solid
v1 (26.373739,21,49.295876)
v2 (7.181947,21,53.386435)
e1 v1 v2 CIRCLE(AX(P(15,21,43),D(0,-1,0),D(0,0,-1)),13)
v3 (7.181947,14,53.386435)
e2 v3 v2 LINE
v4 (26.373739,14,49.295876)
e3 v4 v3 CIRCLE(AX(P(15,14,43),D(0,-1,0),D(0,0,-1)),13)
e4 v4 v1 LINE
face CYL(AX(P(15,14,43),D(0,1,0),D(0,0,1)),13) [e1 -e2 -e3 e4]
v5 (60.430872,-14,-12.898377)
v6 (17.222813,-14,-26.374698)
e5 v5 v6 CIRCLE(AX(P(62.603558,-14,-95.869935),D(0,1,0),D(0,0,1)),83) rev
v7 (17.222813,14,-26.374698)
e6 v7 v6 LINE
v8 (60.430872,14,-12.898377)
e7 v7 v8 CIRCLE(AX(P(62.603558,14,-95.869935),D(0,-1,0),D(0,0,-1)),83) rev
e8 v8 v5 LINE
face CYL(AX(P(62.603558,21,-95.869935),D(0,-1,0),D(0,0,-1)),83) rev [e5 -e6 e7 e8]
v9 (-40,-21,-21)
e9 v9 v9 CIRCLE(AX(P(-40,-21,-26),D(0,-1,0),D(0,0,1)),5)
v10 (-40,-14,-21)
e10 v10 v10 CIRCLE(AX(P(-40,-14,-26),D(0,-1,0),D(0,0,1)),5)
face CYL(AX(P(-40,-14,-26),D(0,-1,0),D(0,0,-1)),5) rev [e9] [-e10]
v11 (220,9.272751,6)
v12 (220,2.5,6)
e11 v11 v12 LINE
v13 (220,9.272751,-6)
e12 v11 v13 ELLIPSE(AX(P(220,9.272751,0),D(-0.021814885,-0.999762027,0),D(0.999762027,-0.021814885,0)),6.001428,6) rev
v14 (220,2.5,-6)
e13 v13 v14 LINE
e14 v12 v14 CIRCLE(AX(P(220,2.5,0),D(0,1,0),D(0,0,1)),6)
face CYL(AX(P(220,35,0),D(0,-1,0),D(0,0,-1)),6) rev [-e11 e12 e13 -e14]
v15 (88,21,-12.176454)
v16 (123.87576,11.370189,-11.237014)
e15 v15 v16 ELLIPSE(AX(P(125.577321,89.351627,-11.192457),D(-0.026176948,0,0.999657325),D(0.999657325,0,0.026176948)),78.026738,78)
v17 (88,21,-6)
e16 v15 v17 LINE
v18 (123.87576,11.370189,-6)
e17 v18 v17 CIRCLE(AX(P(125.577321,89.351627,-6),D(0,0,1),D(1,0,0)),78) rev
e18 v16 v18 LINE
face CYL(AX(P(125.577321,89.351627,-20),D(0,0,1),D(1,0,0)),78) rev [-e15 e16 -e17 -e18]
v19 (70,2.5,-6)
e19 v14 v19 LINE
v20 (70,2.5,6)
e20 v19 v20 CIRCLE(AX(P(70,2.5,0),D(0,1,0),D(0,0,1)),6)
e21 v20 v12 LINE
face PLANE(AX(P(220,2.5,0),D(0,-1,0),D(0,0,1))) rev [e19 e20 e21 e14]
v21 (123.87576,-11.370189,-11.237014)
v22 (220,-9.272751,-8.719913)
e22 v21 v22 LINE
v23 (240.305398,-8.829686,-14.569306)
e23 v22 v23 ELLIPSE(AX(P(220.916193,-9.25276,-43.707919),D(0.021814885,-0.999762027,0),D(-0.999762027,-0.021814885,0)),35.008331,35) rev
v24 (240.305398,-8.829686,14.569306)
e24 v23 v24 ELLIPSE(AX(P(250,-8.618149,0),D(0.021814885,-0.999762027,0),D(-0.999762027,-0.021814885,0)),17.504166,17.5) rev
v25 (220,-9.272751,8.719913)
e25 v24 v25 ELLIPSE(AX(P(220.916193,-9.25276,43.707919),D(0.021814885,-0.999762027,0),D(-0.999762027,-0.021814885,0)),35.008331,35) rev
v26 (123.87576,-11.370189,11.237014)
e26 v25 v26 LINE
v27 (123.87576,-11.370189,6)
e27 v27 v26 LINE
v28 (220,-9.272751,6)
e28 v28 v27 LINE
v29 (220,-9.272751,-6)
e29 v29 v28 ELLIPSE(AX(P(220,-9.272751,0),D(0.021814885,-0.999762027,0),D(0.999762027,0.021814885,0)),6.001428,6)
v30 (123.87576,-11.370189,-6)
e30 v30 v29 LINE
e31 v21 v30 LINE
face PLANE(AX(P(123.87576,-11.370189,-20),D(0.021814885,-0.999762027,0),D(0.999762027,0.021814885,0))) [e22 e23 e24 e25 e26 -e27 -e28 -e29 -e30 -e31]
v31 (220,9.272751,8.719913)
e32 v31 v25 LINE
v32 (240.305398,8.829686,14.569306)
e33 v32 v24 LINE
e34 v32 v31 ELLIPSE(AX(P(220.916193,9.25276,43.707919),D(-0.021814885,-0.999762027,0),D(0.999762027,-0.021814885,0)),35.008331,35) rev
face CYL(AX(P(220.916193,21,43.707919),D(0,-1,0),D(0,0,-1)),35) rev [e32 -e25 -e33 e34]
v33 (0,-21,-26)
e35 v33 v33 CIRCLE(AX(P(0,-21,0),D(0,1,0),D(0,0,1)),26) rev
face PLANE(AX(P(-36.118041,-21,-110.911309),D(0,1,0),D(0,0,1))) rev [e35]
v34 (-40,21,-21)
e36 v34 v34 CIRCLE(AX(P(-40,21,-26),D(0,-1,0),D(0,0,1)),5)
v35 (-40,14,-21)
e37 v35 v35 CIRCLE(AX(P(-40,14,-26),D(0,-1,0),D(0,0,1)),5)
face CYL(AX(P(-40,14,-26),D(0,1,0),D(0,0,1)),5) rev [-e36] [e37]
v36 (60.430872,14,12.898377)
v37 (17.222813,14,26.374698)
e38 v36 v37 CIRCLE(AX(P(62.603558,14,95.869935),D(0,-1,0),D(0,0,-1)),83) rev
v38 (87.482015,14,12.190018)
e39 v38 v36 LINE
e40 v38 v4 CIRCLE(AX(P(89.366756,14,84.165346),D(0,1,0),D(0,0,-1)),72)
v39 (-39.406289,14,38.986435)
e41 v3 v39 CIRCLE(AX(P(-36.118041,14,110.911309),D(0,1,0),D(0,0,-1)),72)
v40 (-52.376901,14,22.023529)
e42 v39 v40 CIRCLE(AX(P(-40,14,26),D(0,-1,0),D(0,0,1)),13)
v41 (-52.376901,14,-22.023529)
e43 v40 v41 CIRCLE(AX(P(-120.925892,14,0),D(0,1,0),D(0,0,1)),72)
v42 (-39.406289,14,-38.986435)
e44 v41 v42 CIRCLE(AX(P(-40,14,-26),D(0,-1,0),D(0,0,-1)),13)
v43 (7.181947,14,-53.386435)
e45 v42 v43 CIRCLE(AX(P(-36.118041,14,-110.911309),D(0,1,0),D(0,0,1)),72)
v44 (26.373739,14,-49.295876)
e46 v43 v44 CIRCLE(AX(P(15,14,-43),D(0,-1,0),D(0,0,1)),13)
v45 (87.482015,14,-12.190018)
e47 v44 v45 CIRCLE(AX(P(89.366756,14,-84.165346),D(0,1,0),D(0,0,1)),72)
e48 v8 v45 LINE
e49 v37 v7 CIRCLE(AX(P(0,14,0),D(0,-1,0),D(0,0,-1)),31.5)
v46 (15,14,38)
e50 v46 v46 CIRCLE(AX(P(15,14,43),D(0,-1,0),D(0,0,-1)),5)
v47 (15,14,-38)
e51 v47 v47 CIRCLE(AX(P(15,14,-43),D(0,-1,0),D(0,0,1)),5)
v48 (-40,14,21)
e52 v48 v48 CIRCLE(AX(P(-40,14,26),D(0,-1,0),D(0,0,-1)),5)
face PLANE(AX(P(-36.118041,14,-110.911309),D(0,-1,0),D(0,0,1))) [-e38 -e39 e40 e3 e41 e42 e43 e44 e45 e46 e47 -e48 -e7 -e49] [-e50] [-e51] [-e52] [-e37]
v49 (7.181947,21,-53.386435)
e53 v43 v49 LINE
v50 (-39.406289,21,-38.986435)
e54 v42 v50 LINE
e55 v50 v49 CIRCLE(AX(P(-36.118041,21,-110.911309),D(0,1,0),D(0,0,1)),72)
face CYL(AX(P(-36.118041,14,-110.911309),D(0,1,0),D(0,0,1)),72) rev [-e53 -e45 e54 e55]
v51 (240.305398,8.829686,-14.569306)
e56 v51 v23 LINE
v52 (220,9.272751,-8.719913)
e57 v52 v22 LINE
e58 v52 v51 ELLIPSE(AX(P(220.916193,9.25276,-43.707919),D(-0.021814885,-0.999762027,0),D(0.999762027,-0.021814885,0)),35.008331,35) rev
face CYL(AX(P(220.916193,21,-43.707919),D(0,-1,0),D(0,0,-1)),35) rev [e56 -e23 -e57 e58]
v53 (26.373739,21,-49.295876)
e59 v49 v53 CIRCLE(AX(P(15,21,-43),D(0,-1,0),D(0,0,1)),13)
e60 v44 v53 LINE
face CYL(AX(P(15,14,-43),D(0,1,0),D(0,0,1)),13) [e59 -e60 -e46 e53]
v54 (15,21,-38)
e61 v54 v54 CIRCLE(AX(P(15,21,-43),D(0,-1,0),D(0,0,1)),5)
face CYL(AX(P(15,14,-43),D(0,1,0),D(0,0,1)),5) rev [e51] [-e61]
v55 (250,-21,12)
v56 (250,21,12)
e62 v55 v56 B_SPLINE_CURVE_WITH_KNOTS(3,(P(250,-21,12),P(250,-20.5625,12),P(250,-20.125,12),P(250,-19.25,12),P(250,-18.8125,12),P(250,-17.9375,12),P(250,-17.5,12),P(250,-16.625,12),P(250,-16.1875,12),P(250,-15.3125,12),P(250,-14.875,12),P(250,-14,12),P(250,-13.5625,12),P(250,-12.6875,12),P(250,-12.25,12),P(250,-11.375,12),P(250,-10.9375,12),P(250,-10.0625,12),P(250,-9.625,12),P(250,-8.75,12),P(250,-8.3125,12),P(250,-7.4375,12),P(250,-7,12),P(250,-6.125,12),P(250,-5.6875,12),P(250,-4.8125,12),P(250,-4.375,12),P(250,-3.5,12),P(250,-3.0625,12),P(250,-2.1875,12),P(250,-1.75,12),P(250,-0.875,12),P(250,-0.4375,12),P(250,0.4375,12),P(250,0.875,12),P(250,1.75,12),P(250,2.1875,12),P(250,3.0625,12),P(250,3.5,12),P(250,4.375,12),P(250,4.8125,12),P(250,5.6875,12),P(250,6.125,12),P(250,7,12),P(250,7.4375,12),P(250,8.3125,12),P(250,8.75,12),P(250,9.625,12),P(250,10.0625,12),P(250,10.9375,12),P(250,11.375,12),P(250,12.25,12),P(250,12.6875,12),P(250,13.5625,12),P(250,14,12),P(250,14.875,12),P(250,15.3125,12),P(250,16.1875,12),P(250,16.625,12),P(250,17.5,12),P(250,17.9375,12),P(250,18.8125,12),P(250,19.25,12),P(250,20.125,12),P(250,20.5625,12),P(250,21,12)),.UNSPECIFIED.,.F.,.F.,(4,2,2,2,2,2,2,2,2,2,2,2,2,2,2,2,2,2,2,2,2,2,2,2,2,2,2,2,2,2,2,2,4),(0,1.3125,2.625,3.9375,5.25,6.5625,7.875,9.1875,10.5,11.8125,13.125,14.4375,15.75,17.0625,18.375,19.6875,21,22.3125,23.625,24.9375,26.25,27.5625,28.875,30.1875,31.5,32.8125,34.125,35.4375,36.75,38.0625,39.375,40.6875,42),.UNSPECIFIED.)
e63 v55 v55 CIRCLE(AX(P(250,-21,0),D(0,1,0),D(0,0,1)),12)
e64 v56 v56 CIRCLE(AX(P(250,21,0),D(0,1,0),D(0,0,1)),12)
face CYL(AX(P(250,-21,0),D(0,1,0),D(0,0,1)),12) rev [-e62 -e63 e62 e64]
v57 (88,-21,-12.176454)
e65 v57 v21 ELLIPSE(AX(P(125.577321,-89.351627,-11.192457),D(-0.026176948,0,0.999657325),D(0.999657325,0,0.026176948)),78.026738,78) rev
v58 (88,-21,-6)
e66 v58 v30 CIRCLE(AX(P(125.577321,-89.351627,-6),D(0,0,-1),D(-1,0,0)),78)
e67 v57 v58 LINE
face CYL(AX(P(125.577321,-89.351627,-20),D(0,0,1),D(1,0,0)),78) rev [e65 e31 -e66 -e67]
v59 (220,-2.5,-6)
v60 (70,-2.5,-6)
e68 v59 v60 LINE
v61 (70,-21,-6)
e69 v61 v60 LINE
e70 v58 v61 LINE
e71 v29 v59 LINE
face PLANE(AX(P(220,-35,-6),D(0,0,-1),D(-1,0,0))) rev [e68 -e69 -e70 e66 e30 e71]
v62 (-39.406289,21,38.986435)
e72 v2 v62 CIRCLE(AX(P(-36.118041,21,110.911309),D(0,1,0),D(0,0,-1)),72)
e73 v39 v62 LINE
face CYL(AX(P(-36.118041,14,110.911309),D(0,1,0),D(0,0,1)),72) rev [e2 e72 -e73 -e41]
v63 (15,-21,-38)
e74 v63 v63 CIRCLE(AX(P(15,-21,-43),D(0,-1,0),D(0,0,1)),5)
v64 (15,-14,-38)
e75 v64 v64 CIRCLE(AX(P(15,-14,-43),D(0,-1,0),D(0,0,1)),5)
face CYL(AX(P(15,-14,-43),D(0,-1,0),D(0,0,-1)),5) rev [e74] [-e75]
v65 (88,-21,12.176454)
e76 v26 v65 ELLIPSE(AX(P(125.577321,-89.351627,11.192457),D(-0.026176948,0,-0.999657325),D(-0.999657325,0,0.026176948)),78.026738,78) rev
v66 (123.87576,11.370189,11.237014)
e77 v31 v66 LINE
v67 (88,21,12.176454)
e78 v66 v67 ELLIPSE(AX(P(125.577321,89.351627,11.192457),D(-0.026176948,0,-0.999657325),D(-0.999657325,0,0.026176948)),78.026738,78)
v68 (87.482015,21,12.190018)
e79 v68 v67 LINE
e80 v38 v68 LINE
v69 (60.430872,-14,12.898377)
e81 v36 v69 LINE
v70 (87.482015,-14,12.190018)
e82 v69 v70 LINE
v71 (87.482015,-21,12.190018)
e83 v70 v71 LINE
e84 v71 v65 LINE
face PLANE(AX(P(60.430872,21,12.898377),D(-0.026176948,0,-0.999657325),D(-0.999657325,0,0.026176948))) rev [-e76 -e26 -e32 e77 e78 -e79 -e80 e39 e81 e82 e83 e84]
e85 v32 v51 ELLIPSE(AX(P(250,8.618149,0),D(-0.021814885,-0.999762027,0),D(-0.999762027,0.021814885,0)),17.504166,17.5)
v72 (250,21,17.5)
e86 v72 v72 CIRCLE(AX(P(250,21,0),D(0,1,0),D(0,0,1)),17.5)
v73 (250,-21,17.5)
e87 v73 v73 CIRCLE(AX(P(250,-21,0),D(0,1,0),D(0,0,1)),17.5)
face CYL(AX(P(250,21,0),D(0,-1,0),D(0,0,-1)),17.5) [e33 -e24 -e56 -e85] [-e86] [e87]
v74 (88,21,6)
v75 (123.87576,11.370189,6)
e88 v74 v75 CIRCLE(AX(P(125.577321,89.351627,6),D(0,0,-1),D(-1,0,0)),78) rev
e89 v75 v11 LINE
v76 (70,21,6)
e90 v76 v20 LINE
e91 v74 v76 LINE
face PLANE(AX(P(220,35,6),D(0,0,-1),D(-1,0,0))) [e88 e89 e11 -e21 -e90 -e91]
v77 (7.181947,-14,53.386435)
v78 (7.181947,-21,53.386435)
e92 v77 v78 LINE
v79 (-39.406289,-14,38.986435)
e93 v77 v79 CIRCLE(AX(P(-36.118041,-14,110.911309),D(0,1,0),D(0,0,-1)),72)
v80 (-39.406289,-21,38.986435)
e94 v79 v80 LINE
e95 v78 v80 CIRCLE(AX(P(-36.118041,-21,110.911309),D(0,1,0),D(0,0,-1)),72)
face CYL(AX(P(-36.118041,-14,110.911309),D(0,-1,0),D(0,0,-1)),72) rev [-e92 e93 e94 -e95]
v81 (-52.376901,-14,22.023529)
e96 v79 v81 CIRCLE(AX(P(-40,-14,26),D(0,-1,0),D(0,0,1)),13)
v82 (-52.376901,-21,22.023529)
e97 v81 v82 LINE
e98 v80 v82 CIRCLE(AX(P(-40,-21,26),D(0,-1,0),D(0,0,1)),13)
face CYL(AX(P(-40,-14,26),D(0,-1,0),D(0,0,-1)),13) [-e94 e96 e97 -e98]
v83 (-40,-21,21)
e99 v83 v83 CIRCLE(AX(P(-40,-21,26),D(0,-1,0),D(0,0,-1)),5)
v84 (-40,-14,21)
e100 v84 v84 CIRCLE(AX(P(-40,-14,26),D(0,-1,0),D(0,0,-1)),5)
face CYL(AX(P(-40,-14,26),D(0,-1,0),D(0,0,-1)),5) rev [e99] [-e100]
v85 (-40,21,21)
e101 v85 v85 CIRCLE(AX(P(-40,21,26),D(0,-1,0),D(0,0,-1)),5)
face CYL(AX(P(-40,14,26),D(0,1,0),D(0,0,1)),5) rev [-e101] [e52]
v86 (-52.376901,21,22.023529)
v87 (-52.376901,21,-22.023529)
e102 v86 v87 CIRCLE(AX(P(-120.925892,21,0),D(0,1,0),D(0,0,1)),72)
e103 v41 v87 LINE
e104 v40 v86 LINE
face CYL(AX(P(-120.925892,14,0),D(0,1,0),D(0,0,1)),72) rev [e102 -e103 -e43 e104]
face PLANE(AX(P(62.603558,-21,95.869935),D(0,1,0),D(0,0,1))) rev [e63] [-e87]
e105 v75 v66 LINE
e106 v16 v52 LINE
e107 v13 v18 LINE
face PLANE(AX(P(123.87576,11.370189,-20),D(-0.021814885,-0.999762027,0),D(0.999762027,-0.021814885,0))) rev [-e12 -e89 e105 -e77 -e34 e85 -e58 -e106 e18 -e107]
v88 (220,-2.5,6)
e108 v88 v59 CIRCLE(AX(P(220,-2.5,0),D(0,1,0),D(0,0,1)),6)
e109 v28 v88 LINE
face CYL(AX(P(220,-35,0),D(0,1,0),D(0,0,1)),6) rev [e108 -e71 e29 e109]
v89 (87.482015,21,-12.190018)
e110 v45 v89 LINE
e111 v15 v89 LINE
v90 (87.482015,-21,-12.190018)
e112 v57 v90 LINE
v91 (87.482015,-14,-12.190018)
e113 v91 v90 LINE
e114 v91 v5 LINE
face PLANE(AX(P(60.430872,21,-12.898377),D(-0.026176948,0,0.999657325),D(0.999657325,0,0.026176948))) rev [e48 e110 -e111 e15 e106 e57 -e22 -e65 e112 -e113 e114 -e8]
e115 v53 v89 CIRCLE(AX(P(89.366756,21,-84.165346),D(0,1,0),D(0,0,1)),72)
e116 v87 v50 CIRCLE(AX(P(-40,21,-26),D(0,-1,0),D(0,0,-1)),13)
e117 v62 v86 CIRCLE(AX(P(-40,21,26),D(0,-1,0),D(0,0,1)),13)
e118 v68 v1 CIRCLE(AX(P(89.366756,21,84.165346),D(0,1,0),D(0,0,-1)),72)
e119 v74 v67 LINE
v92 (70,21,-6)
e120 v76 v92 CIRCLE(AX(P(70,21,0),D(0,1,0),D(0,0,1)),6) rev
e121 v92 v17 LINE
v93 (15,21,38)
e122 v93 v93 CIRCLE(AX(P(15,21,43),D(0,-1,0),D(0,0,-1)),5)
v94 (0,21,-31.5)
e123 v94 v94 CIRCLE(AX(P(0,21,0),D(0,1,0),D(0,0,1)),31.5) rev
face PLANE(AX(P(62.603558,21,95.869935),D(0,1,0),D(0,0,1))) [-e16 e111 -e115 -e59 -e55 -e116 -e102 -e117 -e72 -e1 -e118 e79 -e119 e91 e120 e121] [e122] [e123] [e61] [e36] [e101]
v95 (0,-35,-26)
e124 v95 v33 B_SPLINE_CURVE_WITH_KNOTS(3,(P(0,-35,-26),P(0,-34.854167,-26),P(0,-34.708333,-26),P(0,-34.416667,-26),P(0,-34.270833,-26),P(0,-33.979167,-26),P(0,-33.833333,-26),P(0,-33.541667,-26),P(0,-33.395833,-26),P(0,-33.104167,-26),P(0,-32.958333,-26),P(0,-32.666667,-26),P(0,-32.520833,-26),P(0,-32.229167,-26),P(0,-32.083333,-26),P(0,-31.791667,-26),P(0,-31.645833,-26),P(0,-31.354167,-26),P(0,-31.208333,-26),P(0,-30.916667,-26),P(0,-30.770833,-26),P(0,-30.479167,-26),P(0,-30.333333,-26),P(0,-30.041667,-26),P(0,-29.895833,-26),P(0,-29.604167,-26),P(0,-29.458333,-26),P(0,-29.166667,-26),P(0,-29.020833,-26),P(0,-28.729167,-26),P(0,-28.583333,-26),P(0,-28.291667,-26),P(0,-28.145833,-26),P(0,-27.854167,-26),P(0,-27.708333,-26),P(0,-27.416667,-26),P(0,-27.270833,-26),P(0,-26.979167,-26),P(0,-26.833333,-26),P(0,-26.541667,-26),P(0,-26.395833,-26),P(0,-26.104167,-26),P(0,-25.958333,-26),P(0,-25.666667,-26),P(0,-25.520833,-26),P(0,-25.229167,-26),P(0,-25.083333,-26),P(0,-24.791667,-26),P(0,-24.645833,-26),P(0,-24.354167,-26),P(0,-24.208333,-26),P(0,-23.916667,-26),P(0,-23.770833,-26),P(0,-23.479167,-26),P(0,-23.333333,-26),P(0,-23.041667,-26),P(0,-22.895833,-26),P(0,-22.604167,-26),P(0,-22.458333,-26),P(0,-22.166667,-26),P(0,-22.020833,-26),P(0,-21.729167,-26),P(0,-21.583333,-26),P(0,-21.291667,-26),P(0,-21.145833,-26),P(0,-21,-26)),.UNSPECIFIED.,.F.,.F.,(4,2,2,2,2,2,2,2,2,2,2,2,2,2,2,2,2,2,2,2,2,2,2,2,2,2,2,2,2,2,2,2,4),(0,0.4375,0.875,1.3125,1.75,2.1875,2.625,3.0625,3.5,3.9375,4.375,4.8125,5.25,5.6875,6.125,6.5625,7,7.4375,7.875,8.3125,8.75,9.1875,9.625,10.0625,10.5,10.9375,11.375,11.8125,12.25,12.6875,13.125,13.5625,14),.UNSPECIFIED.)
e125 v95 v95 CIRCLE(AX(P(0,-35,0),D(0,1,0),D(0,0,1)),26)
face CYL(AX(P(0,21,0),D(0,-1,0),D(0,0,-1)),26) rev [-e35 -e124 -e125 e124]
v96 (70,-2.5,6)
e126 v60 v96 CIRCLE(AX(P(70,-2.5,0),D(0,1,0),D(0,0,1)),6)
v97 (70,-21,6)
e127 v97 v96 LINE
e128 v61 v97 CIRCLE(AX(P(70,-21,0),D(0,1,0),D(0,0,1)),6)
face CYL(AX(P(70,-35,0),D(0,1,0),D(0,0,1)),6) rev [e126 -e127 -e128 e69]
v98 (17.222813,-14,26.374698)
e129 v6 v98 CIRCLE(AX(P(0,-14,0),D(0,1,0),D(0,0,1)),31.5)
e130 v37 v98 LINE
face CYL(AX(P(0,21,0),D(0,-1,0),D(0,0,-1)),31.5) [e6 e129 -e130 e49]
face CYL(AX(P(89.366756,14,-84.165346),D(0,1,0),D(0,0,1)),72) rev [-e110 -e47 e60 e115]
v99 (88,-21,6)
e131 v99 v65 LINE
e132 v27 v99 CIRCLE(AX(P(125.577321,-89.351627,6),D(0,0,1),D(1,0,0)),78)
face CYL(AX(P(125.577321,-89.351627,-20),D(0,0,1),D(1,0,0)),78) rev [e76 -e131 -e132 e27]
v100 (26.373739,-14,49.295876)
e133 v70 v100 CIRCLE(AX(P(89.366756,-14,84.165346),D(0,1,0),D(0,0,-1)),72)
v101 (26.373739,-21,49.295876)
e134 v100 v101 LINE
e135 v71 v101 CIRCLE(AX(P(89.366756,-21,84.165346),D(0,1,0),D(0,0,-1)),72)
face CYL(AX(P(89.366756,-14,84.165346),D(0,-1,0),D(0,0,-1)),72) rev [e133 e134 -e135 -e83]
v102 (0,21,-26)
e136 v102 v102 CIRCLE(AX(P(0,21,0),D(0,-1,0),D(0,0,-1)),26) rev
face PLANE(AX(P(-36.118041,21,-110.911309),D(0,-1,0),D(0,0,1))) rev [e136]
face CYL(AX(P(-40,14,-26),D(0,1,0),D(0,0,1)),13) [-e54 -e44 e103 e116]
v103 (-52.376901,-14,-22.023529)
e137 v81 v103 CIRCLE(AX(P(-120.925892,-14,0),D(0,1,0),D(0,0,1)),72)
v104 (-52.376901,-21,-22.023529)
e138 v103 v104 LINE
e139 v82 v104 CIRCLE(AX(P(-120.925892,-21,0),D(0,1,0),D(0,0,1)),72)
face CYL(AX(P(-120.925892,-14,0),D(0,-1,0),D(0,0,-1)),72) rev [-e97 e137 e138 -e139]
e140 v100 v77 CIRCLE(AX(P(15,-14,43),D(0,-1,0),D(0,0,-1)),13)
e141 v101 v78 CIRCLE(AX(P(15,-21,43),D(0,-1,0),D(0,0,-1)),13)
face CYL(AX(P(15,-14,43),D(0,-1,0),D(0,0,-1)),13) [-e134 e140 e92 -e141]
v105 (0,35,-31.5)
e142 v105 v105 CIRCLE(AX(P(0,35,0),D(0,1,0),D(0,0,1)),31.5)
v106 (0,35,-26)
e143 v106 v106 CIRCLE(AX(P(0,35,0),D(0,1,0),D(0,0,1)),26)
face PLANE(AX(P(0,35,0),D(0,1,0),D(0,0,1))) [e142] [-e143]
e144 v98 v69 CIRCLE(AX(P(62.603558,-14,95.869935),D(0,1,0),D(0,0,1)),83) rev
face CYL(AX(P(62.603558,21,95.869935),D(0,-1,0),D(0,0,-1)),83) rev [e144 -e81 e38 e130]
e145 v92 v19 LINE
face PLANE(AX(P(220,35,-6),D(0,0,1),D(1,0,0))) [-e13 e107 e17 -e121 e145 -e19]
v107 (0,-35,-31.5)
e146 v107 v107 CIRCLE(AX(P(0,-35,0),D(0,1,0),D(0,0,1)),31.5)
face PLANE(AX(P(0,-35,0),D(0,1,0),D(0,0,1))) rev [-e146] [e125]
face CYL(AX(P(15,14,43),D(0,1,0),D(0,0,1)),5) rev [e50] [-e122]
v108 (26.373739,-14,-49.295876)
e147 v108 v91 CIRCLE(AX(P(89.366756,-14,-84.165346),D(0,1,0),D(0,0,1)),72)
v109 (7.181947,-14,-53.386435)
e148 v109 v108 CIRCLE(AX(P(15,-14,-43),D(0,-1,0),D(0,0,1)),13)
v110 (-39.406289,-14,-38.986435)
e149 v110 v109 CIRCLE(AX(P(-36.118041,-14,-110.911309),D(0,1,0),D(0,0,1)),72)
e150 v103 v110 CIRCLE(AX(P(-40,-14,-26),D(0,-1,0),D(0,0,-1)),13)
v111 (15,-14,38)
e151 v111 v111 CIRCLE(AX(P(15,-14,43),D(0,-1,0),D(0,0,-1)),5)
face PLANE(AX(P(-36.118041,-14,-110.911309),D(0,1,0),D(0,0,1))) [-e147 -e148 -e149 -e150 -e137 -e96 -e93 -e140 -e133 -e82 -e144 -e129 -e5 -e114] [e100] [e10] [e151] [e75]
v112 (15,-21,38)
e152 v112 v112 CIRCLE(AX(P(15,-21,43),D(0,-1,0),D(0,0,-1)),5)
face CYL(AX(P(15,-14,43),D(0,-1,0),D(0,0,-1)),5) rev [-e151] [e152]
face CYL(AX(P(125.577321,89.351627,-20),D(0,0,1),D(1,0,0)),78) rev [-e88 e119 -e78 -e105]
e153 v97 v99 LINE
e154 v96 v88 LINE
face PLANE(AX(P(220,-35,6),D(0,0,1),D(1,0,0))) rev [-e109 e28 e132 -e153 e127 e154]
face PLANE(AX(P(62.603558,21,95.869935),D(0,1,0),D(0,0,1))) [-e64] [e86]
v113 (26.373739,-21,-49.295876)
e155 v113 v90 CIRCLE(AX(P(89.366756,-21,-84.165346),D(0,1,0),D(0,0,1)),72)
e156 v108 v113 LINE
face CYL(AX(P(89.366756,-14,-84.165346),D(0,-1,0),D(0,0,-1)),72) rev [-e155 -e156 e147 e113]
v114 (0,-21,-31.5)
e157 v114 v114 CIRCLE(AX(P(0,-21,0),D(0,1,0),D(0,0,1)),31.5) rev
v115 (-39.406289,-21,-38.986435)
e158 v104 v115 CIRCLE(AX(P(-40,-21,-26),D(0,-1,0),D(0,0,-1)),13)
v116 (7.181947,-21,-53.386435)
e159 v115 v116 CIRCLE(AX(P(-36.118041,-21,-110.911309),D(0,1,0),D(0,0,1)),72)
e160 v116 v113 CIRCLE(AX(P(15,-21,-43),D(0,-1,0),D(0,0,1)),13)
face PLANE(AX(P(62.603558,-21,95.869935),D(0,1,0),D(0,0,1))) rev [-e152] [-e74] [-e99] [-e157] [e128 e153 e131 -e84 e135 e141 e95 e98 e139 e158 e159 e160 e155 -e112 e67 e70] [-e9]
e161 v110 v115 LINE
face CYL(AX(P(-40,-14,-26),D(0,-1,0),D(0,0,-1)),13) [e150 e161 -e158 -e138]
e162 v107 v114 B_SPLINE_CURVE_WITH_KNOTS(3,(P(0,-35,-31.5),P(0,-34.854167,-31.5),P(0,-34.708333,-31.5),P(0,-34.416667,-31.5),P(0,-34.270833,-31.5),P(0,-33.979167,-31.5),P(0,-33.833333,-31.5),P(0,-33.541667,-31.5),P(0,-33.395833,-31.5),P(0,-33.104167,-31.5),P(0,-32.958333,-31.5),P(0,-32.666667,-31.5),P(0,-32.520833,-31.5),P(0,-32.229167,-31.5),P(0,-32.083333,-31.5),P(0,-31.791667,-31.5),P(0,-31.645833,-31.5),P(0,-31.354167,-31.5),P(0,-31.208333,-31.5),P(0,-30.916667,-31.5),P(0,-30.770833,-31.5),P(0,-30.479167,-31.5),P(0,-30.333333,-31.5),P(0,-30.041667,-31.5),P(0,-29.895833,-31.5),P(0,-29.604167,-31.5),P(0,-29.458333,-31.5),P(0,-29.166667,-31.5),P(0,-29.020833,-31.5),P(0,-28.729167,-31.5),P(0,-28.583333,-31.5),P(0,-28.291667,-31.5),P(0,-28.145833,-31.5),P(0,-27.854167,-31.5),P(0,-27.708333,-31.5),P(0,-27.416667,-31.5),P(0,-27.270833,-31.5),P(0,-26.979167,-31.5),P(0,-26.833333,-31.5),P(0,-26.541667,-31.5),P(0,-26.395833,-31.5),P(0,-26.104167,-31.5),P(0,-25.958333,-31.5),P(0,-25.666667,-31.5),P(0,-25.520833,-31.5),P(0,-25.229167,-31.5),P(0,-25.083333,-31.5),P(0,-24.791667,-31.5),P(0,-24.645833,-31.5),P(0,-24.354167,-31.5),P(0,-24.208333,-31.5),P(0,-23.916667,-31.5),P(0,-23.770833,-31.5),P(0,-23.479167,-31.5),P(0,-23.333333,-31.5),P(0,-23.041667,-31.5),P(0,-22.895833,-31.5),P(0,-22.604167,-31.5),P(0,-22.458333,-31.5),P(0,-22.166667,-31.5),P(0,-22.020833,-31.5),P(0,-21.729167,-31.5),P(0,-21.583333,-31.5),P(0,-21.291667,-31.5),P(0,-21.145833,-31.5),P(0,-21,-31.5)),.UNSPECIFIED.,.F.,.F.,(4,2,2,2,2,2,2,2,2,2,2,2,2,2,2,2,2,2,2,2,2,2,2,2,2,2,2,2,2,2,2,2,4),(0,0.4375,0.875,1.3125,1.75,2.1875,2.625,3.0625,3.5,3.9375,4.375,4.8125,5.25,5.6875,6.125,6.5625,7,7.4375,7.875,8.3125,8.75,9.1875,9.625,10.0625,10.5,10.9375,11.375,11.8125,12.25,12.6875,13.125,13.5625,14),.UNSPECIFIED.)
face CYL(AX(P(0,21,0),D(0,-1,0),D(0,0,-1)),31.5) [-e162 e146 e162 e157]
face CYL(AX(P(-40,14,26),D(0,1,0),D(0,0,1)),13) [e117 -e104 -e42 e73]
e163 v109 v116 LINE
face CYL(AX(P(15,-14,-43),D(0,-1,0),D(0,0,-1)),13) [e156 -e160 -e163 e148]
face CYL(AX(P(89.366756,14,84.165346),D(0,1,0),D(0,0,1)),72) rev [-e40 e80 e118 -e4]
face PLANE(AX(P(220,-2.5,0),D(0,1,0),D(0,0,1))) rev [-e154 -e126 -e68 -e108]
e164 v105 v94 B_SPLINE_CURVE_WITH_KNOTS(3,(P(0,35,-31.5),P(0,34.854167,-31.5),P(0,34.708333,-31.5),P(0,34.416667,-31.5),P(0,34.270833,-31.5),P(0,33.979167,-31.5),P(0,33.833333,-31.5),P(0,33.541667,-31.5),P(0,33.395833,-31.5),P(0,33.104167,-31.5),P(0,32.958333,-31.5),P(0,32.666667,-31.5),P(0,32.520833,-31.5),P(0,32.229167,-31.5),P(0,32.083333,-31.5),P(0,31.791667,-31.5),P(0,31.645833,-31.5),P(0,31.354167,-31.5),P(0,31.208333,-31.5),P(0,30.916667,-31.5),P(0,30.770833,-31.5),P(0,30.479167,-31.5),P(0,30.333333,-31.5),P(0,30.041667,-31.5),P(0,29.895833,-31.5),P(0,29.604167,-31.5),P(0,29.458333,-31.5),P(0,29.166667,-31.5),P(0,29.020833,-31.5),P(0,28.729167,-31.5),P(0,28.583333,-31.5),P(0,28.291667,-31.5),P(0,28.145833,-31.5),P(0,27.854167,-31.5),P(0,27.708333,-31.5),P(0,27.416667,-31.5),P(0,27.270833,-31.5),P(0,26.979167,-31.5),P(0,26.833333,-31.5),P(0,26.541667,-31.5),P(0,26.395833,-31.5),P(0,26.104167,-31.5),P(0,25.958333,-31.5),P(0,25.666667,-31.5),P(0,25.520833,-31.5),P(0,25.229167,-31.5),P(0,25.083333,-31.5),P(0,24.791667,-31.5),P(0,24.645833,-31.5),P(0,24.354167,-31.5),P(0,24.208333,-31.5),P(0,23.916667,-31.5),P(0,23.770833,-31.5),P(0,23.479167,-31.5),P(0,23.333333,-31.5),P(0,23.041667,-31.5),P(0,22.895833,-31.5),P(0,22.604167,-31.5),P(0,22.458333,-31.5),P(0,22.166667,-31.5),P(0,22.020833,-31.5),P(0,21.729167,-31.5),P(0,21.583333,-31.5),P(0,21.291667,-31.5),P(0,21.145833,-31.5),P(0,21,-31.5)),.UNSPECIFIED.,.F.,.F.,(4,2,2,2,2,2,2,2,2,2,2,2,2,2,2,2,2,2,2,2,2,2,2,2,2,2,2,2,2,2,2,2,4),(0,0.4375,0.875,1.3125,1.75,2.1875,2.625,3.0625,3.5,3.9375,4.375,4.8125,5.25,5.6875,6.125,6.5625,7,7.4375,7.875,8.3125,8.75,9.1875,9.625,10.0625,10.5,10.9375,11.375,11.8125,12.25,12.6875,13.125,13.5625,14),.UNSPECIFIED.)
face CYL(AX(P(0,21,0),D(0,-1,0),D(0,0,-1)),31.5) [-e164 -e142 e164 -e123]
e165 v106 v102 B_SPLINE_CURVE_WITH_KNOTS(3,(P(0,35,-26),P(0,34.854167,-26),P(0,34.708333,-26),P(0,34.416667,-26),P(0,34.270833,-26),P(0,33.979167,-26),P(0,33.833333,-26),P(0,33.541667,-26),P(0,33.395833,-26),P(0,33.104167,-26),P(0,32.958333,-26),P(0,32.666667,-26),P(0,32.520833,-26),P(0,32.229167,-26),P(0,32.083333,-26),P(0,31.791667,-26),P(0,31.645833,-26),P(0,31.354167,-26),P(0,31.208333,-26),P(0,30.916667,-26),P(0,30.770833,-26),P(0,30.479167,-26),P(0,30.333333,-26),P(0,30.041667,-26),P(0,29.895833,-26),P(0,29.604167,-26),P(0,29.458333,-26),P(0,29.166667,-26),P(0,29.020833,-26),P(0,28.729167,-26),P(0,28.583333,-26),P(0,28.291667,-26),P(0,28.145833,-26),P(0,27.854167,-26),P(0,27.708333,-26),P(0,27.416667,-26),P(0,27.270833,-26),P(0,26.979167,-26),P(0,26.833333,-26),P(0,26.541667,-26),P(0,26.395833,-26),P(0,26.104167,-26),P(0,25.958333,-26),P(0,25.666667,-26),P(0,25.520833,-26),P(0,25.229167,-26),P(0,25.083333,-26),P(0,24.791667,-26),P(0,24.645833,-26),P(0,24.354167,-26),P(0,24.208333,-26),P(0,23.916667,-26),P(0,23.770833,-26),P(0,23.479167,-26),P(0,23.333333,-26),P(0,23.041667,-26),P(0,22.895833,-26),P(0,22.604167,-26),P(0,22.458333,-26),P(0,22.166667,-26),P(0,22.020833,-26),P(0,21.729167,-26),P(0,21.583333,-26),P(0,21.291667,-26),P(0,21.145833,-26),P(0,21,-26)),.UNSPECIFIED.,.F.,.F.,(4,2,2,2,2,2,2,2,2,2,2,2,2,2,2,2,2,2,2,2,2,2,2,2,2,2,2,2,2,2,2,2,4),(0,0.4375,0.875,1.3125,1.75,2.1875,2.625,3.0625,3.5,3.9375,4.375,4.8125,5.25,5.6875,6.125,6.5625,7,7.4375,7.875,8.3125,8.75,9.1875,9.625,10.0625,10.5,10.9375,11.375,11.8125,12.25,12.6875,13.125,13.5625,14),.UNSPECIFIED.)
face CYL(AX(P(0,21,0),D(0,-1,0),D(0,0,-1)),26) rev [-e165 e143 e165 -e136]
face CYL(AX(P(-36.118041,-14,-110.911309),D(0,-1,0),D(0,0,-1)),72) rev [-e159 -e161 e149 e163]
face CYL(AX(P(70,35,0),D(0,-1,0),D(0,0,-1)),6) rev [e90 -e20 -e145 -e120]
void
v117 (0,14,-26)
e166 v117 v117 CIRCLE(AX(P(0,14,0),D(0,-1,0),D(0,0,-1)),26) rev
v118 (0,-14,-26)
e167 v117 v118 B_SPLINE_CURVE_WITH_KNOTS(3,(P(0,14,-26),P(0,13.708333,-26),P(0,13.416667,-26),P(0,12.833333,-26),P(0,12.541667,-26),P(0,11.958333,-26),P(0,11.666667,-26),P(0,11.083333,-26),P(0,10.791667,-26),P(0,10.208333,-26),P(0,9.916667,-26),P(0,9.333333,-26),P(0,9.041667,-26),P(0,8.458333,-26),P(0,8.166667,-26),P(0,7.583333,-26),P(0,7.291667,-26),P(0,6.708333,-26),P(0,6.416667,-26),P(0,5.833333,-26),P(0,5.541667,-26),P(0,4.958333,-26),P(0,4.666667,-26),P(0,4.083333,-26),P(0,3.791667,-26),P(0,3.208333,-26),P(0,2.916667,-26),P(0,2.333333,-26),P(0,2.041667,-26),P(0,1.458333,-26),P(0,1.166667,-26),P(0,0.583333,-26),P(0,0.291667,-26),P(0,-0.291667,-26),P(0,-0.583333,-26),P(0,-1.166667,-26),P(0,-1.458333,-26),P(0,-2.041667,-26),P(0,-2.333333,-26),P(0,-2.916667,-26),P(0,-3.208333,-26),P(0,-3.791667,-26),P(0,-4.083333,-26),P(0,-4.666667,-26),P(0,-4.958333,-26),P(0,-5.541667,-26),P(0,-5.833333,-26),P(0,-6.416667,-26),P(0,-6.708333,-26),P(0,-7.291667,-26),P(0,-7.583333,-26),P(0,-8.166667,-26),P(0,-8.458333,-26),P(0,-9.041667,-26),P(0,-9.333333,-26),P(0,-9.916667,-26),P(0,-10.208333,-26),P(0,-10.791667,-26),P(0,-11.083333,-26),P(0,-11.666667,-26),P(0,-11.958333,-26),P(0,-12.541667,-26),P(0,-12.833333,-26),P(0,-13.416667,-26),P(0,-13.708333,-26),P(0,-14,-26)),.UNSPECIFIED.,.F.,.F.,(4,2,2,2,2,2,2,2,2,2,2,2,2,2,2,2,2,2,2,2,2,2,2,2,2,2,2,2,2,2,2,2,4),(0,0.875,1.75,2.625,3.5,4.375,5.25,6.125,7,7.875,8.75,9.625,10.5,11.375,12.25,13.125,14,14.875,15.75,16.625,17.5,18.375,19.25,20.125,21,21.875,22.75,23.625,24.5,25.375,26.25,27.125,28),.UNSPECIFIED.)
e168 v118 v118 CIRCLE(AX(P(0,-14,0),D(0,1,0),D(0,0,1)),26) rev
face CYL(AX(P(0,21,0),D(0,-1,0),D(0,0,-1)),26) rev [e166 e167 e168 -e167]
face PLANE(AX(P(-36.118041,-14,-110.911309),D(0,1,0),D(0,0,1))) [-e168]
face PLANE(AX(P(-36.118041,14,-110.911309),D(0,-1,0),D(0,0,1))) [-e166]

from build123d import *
from build123d.topology import SkipClean

# Parameters (mm, degrees)
BOSS_EXTRUDE1_DEPTH = 21
SKETCH2_R           = 12
CUT_EXTRUDE1_DEPTH  = 21
SKETCH3_R           = 26
CUT_EXTRUDE2_DEPTH  = 273.603191471
SKETCH5_R           = 31.5
SKETCH5_R_2         = 26
BOSS_EXTRUDE2_DEPTH = 35
SKETCH4_R           = 5
BOSS_EXTRUDE3_DEPTH = 7
CUT_EXTRUDE3_DEPTH  = 20
CUT_EXTRUDE5_REACH  = 280.977
CUT_EXTRUDE6_REACH  = 280.977
CUT_EXTRUDE7_START  = -2.5
CUT_EXTRUDE7_DEPTH  = 274.030851267


with BuildPart() as part:
    # Sketch1 → Boss-Extrude1 (new, symmetric)
    with BuildSketch(Plane(origin=(0, 0, 0), x_dir=(1, 0, 0), z_dir=(0, 1, 0))):
        with BuildLine():
            Line((60.430871603, 12.898377286), (220, 8.719912605))
            ThreePointArc((220, 8.719912605), (230.604685788, 10.075596562), (240.30539773, 14.569306326))
            ThreePointArc((240.30539773, 14.569306326), (267.5, 0), (240.30539773, -14.569306326))
            ThreePointArc((240.30539773, -14.569306326), (230.604685788, -10.075596562), (220, -8.719912605))
            Line((220, -8.719912605), (60.430871603, -12.898377286))
            ThreePointArc((60.430871603, -12.898377286), (37.890504435, -16.634432055), (17.222812986, -26.374698346))
            ThreePointArc((17.222812986, -26.374698346), (-31.5, 0), (17.222812986, 26.374698346))
            ThreePointArc((17.222812986, 26.374698346), (37.890504435, 16.634432055), (60.430871603, 12.898377286))
        make_face()
    extrude(amount=BOSS_EXTRUDE1_DEPTH, both=True)

    # Sketch2 → Cut-Extrude1 (cut, symmetric)
    with BuildSketch(Plane(origin=(0, 0, 0), x_dir=(1, 0, 0), z_dir=(0, 1, 0))):
        with Locations(Location((250, 0, 0), (0, 0, 270))):
            Circle(SKETCH2_R)
    extrude(amount=CUT_EXTRUDE1_DEPTH, both=True, mode=Mode.SUBTRACT)

    # Sketch3 → Cut-Extrude2 (cut, through all)
    with BuildSketch(Plane.XZ.offset(21)):
        with Locations(Location((0, 0, 0), (0, 0, 270))):
            Circle(SKETCH3_R)
    extrude(amount=-CUT_EXTRUDE2_DEPTH, mode=Mode.SUBTRACT)

    # Sketch5 → Boss-Extrude2 (add, symmetric)
    with SkipClean():  # the faces are left unmerged after this step: merging them gives an invalid solid
        with BuildSketch(Plane(origin=(0, 0, 0), x_dir=(1, 0, 0), z_dir=(0, 1, 0))):
            with Locations(Location((0, 0, 0), (0, 0, 270))):
                Circle(SKETCH5_R)
            with Locations(Location((0, 0, 0), (0, 0, 90))):
                Circle(SKETCH5_R_2, mode=Mode.SUBTRACT)
        extrude(amount=BOSS_EXTRUDE2_DEPTH, both=True)

    # Sketch4 → Boss-Extrude3 (add)
    with BuildSketch(Plane.XZ.offset(21)):
        with BuildLine():
            Line((87.482015231, 12.190018161), (87.482015231, -12.190018161))
            ThreePointArc((87.482015231, -12.190018161), (51.997088566, -22.622612499), (26.373739078, -49.29587638))
            ThreePointArc((26.373739078, -49.29587638), (17.709961948, -55.714405462), (7.181946677, -53.386435492))
            ThreePointArc((7.181946677, -53.386435492), (-14.855989459, -42.122318837), (-39.406288617, -38.986435492))
            ThreePointArc((-39.406288617, -38.986435492), (-50.326951915, -33.896458963), (-52.376901133, -22.023529412))
            ThreePointArc((-52.376901133, -22.023529412), (-48.925892025, 0), (-52.376901133, 22.023529412))
            ThreePointArc((-52.376901133, 22.023529412), (-50.326951915, 33.896458963), (-39.406288617, 38.986435492))
            ThreePointArc((-39.406288617, 38.986435492), (-14.855989459, 42.122318837), (7.181946677, 53.386435492))
            ThreePointArc((7.181946677, 53.386435492), (17.709961948, 55.714405462), (26.373739078, 49.29587638))
            ThreePointArc((26.373739078, 49.29587638), (51.997088566, 22.622612499), (87.482015231, 12.190018161))
        make_face()
        with Locations(Location((15, 43, 0), (0, 0, 270))):
            Circle(SKETCH4_R, mode=Mode.SUBTRACT)
        with Locations(Location((-40, 26, 0), (0, 0, 270))):
            Circle(SKETCH4_R, mode=Mode.SUBTRACT)
        with Locations(Location((15, -43, 0), (0, 0, 90))):
            Circle(SKETCH4_R, mode=Mode.SUBTRACT)
        with Locations(Location((-40, -26, 0), (0, 0, 90))):
            Circle(SKETCH4_R, mode=Mode.SUBTRACT)
    boss_extrude3 = extrude(amount=-BOSS_EXTRUDE3_DEPTH)

    # Mirror1: Boss-Extrude3 across plane
    add(boss_extrude3.mirror(Plane.ZX))

    # Sketch6 → Cut-Extrude3 (cut, symmetric)
    with BuildSketch(Plane.XY):
        with BuildLine():
            Line((123.875759549, 11.370189358), (232.5, 9))
            Line((232.5, 9), (232.5, 21))
            Line((232.5, 21), (88, 21))
            ThreePointArc((88, 21), (105.356268471, 14.018307807), (123.875759549, 11.370189358))
        make_face()
    cut_extrude3 = extrude(amount=CUT_EXTRUDE3_DEPTH, both=True, mode=Mode.SUBTRACT)

    # Mirror2: Cut-Extrude3 across plane
    add(cut_extrude3.mirror(Plane.ZX), mode=Mode.SUBTRACT)

    # Cut-Extrude5: up to this face of the body (flat: up to its plane)
    cut_extrude5_end = Plane(part.part.faces().sort_by_distance((176.036341328, 10.232041415, 0))[0])
    # Sketch7 → Cut-Extrude5 (cut, up to the picked face)
    with BuildSketch(Plane(origin=(0, 21, 0), x_dir=(1, 0, 0), z_dir=(0, 1, 0)), mode=Mode.PRIVATE) as cut_extrude5_sk1:
        with BuildLine():
            Line((232.5, 10.680424072), (232.5, 0))
            ThreePointArc((232.5, 0), (234.574282193, 8.264213825), (240.30539773, 14.569306326))
            ThreePointArc((240.30539773, 14.569306326), (236.524290746, 12.380817442), (232.5, 10.680424072))
        make_face()
    cut_extrude5_tool1 = split(extrude(cut_extrude5_sk1.sketch, amount=-CUT_EXTRUDE5_REACH, mode=Mode.PRIVATE), bisect_by=cut_extrude5_end, keep=Keep.BOTH, mode=Mode.PRIVATE)
    cut_extrude5 = cut_extrude5_tool1.solids().sort_by(Axis((234.203382, 21, -9.039339), (0, -1, 0)))[0]
    add(cut_extrude5, mode=Mode.SUBTRACT)

    # Mirror10: Cut-Extrude5 across plane
    with SkipClean():  # the faces are left unmerged after this step: merging them gives an invalid solid
        add(cut_extrude5.mirror(Plane.XY), mode=Mode.SUBTRACT)

    # Cut-Extrude6: up to this face of the body (flat: up to its plane)
    cut_extrude6_end = Plane(part.part.faces().sort_by_distance((176.036341328, -10.232041415, 0))[0])
    # Sketch9 → Cut-Extrude6 (cut, up to the picked face)
    with BuildSketch(Plane.XZ.offset(21), mode=Mode.PRIVATE) as cut_extrude6_sk1:
        with BuildLine():
            Line((232.5, 10.680424072), (232.5, 0))
            ThreePointArc((232.5, 0), (234.574282193, 8.264213825), (240.30539773, 14.569306326))
            ThreePointArc((240.30539773, 14.569306326), (236.524290746, 12.380817442), (232.5, 10.680424072))
        make_face()
    cut_extrude6_tool1 = split(extrude(cut_extrude6_sk1.sketch, amount=-CUT_EXTRUDE6_REACH, mode=Mode.PRIVATE), bisect_by=cut_extrude6_end, keep=Keep.BOTH, mode=Mode.PRIVATE)
    # Sketch9 → Cut-Extrude6 (cut, up to the picked face)
    with BuildSketch(Plane.XZ.offset(21), mode=Mode.PRIVATE) as cut_extrude6_sk2:
        with BuildLine():
            Line((232.5, 0), (232.5, -10.680424072))
            ThreePointArc((232.5, -10.680424072), (236.524290746, -12.380817442), (240.30539773, -14.569306326))
            ThreePointArc((240.30539773, -14.569306326), (234.574282193, -8.264213825), (232.5, 0))
        make_face()
    cut_extrude6_tool2 = split(extrude(cut_extrude6_sk2.sketch, amount=-CUT_EXTRUDE6_REACH, mode=Mode.PRIVATE), bisect_by=cut_extrude6_end, keep=Keep.BOTH, mode=Mode.PRIVATE)
    add(cut_extrude6_tool1.solids().sort_by(Axis((234.203382, -21, 9.039339), (0, 1, 0)))[0], mode=Mode.SUBTRACT)
    add(cut_extrude6_tool2.solids().sort_by(Axis((234.203382, -21, -9.039339), (0, 1, 0)))[0], mode=Mode.SUBTRACT)

    # Sketch10 → Cut-Extrude7 (cut, through all)
    with SkipClean():  # the faces are left unmerged after this step: merging them gives an invalid solid
        with BuildSketch(Plane(origin=(0, 0, 0), x_dir=(1, 0, 0), z_dir=(0, 1, 0)).offset(CUT_EXTRUDE7_START)):
            with BuildLine():
                Line((220, -6), (70, -6))
                ThreePointArc((70, -6), (64, 0), (70, 6))
                Line((70, 6), (220, 6))
                ThreePointArc((220, 6), (226, 0), (220, -6))
            make_face()
        cut_extrude7 = extrude(amount=-CUT_EXTRUDE7_DEPTH, mode=Mode.SUBTRACT)

    # Mirror11: Cut-Extrude7 across plane
    with SkipClean():  # the faces are left unmerged after this step: merging them gives an invalid solid
        add(cut_extrude7.mirror(Plane.ZX), mode=Mode.SUBTRACT)


solid = part.part
